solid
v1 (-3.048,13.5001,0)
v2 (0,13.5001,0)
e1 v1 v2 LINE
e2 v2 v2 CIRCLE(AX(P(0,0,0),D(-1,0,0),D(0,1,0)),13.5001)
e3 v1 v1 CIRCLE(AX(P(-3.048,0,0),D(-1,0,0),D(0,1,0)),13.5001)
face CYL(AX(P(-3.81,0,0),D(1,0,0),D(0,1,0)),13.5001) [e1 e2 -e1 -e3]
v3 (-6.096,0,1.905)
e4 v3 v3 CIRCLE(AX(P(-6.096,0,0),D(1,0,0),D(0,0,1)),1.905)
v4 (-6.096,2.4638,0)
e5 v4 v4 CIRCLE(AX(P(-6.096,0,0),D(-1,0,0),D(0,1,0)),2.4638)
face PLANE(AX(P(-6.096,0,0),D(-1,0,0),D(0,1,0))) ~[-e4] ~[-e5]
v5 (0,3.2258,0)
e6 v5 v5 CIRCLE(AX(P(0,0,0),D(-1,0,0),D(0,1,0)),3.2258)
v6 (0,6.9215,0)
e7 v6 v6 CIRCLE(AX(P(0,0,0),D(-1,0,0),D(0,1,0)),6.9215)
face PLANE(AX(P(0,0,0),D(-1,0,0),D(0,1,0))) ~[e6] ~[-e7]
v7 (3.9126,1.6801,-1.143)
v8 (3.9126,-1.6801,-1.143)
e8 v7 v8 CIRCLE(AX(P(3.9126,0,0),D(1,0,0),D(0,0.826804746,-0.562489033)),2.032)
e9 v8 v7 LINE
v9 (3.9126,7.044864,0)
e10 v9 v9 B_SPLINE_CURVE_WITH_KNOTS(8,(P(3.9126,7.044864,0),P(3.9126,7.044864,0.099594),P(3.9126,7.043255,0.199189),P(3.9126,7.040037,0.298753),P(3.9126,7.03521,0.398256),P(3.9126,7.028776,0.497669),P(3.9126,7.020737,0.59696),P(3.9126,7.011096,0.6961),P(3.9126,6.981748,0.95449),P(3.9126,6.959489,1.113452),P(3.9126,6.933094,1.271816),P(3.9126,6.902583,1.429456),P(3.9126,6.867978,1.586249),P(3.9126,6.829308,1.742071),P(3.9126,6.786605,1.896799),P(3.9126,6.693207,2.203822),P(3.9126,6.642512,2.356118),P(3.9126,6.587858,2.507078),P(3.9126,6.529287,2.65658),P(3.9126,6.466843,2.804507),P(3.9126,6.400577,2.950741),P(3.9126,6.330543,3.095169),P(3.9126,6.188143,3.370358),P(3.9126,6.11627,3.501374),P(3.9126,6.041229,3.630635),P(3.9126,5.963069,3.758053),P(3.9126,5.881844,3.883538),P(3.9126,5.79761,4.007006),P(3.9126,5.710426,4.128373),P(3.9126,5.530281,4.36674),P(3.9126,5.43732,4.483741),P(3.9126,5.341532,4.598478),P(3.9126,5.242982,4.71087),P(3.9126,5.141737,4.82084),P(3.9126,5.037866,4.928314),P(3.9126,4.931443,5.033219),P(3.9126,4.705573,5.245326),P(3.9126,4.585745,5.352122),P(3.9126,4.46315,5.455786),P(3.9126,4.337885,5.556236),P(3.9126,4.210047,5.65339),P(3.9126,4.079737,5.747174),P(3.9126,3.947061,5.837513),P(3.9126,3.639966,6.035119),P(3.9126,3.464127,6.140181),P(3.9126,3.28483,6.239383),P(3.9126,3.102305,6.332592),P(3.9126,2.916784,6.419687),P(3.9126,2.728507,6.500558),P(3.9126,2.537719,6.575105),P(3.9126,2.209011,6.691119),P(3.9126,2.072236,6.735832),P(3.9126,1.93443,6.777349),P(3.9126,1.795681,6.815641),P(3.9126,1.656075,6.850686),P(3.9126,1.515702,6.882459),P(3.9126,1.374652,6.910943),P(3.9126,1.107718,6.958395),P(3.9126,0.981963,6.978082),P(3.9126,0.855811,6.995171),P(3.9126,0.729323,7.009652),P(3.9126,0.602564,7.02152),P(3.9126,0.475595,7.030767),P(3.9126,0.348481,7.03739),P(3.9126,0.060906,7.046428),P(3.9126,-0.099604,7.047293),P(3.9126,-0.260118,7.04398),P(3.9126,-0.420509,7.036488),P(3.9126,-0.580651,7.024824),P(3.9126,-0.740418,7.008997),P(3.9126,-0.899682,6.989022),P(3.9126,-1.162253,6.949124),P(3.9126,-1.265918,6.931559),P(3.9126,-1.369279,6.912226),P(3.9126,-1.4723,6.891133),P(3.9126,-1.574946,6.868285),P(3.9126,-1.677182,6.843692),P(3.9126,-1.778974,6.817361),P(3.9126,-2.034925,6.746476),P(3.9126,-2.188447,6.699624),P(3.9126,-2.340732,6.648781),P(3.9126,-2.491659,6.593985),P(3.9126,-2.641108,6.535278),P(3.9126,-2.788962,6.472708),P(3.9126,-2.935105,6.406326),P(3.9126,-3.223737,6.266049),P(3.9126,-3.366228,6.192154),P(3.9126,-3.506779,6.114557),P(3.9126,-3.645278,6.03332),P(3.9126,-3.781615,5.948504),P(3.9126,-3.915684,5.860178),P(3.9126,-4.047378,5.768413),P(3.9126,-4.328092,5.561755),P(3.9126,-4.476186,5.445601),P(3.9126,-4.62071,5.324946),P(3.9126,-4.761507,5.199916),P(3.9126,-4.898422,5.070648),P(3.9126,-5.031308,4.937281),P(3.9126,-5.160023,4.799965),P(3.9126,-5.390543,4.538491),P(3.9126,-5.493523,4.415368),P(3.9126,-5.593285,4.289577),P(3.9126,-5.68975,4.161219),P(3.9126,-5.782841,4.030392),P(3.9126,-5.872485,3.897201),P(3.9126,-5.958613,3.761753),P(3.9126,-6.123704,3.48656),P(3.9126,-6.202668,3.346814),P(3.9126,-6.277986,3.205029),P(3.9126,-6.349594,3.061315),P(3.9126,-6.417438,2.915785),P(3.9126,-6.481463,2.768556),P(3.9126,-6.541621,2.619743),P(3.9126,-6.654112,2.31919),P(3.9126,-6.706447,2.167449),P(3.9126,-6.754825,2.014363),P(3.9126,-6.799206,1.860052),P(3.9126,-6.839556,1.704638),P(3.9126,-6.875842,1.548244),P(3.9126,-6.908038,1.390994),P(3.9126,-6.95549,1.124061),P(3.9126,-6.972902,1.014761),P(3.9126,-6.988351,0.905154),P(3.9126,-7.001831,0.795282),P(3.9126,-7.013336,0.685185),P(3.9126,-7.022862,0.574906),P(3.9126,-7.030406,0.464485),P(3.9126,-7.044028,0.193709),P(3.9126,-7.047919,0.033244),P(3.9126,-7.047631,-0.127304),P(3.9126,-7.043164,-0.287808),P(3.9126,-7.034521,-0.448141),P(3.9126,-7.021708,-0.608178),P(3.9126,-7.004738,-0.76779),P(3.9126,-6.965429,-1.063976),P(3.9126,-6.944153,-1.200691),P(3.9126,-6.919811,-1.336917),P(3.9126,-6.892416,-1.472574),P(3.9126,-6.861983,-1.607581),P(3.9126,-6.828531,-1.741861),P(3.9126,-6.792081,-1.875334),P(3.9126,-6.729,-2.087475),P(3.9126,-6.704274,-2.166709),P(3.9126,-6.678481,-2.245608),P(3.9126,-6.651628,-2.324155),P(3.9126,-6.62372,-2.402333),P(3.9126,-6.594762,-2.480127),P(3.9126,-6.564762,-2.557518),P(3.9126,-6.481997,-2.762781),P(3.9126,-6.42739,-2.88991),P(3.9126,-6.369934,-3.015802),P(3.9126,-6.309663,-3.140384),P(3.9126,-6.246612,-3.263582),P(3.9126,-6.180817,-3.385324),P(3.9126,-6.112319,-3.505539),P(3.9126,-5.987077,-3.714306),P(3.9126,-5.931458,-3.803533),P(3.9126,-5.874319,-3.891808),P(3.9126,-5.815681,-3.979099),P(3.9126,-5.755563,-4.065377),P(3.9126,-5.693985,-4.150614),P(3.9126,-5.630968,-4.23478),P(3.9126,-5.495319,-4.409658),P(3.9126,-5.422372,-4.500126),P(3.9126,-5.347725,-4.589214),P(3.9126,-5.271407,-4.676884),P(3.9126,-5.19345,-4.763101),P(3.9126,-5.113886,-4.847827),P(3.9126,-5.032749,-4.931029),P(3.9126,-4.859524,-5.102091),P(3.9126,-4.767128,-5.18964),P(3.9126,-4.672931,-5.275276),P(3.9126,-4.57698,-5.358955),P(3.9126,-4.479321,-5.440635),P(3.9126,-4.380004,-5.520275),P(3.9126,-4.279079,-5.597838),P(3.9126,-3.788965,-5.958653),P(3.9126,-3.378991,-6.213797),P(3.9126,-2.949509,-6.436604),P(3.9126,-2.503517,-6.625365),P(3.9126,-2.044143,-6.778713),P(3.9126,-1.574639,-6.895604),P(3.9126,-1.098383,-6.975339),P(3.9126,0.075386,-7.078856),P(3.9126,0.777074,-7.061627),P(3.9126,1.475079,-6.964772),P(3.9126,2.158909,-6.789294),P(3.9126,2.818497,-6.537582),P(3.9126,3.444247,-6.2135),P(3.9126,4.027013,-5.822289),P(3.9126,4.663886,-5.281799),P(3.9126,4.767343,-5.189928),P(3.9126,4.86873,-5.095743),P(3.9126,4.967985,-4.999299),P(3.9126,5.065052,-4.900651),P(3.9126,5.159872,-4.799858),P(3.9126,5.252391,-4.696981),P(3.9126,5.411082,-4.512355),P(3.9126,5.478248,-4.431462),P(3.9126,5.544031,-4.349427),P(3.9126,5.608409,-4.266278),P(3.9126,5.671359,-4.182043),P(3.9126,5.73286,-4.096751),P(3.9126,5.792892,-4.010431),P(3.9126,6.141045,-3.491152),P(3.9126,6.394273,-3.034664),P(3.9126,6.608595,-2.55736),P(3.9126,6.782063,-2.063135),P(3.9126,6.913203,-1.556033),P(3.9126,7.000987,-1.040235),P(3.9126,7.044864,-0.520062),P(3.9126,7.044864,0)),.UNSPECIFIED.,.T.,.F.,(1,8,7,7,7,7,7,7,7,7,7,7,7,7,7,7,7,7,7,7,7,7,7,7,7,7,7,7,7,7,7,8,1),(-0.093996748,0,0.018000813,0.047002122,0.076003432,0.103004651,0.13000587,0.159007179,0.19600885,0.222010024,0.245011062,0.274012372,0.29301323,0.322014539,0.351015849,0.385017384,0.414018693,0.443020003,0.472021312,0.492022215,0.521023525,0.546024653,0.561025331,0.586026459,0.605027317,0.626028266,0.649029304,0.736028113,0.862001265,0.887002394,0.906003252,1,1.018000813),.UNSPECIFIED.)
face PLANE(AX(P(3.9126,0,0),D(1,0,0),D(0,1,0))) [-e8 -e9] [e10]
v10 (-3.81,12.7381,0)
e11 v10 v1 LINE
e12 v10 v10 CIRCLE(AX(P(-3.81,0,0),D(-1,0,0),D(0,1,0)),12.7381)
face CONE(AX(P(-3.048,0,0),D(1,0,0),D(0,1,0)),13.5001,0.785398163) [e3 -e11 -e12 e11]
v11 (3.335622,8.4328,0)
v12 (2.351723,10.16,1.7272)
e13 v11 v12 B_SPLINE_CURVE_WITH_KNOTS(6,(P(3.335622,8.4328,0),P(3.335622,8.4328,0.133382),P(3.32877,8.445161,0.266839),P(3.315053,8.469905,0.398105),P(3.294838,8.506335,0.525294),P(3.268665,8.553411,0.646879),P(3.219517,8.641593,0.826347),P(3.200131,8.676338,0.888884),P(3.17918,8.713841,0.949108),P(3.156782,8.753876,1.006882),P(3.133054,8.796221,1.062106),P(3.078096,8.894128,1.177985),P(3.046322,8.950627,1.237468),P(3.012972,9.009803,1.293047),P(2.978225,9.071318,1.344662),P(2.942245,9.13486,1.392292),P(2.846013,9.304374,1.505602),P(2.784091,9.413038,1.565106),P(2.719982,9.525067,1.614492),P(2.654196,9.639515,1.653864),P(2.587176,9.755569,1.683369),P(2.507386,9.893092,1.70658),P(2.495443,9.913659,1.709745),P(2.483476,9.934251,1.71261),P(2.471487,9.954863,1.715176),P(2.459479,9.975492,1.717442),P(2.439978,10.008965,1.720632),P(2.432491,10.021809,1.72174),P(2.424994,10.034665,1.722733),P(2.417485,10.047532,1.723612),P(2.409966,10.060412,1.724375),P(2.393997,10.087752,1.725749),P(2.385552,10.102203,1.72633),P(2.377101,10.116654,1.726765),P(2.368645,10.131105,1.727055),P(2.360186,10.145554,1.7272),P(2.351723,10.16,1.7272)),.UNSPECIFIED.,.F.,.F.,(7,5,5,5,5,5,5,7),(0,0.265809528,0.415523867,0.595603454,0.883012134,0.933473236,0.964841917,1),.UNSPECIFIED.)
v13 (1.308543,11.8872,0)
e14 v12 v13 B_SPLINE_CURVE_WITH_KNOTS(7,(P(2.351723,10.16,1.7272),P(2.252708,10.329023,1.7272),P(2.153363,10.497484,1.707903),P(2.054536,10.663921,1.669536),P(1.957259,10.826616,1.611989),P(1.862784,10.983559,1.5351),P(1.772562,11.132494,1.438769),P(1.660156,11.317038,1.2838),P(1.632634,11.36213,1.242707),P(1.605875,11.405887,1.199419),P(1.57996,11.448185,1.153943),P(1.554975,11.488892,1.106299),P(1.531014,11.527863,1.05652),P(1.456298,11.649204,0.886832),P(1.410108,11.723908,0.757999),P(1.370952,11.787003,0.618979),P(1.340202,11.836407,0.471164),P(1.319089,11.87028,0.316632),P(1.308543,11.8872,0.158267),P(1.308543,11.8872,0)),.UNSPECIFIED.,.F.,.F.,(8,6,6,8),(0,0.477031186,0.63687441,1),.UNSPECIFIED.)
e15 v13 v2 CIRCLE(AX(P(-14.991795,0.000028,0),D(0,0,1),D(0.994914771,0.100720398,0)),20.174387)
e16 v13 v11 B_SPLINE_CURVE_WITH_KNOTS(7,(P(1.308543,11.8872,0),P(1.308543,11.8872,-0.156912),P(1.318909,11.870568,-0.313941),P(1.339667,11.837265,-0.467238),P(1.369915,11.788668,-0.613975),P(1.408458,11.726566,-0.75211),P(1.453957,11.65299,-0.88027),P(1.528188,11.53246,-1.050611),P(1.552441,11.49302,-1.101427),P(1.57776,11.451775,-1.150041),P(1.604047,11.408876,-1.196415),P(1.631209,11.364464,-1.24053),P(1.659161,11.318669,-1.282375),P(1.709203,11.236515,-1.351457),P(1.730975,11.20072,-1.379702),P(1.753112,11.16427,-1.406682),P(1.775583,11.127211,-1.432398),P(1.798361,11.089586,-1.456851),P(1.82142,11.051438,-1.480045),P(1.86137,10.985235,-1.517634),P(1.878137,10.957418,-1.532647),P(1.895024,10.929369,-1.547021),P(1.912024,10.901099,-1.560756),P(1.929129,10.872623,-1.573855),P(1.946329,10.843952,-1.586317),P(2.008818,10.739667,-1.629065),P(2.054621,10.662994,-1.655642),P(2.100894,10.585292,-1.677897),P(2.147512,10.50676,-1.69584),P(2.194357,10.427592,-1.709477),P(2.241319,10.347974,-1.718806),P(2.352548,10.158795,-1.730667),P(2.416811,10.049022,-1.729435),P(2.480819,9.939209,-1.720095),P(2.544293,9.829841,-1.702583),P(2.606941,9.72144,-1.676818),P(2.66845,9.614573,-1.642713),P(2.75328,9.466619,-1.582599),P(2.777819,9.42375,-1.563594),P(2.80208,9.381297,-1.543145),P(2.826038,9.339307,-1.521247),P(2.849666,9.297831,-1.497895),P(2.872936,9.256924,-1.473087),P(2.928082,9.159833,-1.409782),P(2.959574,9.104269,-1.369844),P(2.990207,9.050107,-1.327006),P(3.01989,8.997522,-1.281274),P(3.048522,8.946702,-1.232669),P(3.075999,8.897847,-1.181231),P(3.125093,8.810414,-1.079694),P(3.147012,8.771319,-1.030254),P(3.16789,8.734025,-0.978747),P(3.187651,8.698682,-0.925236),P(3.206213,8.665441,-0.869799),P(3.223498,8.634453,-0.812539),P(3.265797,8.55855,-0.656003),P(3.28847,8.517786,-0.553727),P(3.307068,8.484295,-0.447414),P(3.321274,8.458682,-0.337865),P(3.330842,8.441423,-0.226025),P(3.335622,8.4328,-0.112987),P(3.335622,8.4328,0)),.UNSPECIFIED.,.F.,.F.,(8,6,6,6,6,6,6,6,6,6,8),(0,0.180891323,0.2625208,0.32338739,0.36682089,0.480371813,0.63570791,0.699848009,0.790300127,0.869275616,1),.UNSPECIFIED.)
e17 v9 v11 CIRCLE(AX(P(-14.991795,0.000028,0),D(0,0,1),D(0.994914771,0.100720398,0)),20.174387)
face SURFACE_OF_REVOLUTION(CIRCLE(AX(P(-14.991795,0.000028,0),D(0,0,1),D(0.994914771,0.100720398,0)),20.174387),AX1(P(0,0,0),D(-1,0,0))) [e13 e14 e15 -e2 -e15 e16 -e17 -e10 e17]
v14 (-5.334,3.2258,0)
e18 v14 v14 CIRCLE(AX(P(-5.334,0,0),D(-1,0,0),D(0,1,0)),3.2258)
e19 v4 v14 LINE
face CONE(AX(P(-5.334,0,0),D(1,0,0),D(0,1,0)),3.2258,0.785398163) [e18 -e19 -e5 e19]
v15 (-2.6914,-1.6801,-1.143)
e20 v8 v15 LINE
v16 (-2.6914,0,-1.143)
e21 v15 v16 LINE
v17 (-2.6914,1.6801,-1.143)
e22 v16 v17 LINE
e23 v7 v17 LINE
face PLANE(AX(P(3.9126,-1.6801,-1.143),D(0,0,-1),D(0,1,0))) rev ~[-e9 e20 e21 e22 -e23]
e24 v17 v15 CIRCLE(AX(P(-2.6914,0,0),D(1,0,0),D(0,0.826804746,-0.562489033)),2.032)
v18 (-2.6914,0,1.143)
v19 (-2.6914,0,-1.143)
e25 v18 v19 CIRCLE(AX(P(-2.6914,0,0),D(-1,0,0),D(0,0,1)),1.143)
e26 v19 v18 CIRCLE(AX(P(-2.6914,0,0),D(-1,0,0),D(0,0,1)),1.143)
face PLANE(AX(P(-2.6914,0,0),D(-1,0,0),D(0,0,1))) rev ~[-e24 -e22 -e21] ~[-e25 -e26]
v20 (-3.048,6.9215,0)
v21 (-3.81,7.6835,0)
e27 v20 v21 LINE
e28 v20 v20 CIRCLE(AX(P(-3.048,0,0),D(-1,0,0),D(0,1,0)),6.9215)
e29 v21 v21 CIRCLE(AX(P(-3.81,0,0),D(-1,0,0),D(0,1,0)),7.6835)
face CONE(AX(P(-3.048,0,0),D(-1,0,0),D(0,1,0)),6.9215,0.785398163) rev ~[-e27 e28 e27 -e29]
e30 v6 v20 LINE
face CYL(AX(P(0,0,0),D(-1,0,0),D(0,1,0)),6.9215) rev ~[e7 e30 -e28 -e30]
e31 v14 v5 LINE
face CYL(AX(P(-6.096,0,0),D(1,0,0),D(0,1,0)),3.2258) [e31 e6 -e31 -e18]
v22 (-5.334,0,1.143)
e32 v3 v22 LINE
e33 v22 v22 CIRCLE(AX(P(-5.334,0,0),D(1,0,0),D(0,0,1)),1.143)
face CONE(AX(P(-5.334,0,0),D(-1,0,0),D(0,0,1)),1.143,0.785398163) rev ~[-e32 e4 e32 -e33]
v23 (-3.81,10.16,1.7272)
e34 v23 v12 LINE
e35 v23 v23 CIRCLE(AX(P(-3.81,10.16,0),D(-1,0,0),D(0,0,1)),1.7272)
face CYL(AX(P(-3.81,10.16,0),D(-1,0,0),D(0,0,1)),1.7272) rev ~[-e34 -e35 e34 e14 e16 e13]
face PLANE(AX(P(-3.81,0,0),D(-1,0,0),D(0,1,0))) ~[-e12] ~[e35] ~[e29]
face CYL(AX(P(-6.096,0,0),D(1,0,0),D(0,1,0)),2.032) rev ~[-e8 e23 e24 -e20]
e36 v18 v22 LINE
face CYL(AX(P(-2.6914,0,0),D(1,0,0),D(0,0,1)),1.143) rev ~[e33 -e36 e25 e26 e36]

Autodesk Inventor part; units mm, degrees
ref_plane "XZ Plane" through (0, 0, 0) normal (0, 1, 0) x (-1, 0, 0)
ref_plane "XY Plane" through (0, 0, 0) normal (0, 0, 1) x (1, 0, 0)
sketch "Sketch1" plane through (0, 0, 0) normal (0, 0, 1) x (1, 0, 0)
  line L0 (0, 0) -> (-8.052, 0) construction
  line L1 (-6.096, 2.032) -> (5.08, 2.032)
  line L2 (-6.096, 2.032) -> (-6.096, 3.2258)
  line L3 (-6.096, 3.2258) -> (0, 3.2258)
  line L4 (0, 3.2258) -> (0, 6.9215)
  line L5 (0, 6.9215) -> (-3.81, 6.9215)
  line L6 (-3.81, 6.9215) -> (-3.81, 13.5001)
  line L7 (-3.81, 13.5001) -> (0, 13.5001)
  arc A0 (5.08, 2.032) -> (0, 13.5001) centre (-14.9919, 0) ccw
  dimension "d0" = 2.032
  dimension "d1" = 13.5001
  dimension "d2" = 6.096
  dimension "d3" = 3.2258
  dimension "d4" = 3.81
  dimension "d5" = 6.9215
  dimension "d7" = 5.08
revolve "Revolution1" add sketch "Sketch1" angle 360 about axis through (0, 0, 0) along (-1, 0, 0)
ref_plane "Work Plane3" through (3.9126, 0, 0) normal (1, 0, 0) x (0, 1, 0)
ref_plane "Work Plane2" through (5.1826, 0, 0) normal (1, 0, 0) x (0, 1, 0)
sketch "Sketch2" plane through (3.9126, 0, 0) normal (1, 0, 0) x (0, 1, 0)
  circle A0 centre (0, 0) radius 2.032 projected
  line L0 (-1.6801, -1.143) -> (1.6801, -1.143)
  dimension "d10" = 3.175
extrude "Extrusion1" add sketch "Sketch2" against normal blind 6.604 contours L0 A0 picked at (-0.4517, -1.2667)
sketch "Sketch3" plane through (-2.6914, 0, 0) normal (-1, 0, 0) x (0, 0, 1)
  arc A0 (-1.143, 1.6801) -> (-1.143, -1.6801) centre (0, 0) ccw projected
  line L0 (-1.143, -1.6801) -> (-1.143, 1.6801) projected
  circle A1 centre (0, 0) radius 1.143
  circle A2 centre (0, 0) radius 2.032 projected
  dimension "d13" = 2.286
extrude "Extrusion2" add sketch "Sketch3" along normal up to surface (3.4046 mm away)
sketch "Sketch4" plane through (-3.81, 0, 0) normal (-1, 0, 0) x (0, 0, 1)
  circle A0 centre (0, 10.16) radius 1.7272 projected
extrude "Extrusion3" cut sketch "Sketch4" against normal through all
chamfer "Chamfer1" distance 0.762 angle 45 4 edges at (-3.81, -13.5001, 0) (-3.81, -6.9215, 0) (-6.096, -3.2258, 0) (-6.096, 0, -1.143)
sketch "Sketch5" plane through (3.9126, 0, 0) normal (1, 0, 0) x (0, 1, 0)
  circle A0 centre (0, 0) radius 22.931
extrude "Extrusion4" cut sketch "Sketch5" along normal blind 25.4
properties part number "Flexiwheel Hub - Motor Side"
